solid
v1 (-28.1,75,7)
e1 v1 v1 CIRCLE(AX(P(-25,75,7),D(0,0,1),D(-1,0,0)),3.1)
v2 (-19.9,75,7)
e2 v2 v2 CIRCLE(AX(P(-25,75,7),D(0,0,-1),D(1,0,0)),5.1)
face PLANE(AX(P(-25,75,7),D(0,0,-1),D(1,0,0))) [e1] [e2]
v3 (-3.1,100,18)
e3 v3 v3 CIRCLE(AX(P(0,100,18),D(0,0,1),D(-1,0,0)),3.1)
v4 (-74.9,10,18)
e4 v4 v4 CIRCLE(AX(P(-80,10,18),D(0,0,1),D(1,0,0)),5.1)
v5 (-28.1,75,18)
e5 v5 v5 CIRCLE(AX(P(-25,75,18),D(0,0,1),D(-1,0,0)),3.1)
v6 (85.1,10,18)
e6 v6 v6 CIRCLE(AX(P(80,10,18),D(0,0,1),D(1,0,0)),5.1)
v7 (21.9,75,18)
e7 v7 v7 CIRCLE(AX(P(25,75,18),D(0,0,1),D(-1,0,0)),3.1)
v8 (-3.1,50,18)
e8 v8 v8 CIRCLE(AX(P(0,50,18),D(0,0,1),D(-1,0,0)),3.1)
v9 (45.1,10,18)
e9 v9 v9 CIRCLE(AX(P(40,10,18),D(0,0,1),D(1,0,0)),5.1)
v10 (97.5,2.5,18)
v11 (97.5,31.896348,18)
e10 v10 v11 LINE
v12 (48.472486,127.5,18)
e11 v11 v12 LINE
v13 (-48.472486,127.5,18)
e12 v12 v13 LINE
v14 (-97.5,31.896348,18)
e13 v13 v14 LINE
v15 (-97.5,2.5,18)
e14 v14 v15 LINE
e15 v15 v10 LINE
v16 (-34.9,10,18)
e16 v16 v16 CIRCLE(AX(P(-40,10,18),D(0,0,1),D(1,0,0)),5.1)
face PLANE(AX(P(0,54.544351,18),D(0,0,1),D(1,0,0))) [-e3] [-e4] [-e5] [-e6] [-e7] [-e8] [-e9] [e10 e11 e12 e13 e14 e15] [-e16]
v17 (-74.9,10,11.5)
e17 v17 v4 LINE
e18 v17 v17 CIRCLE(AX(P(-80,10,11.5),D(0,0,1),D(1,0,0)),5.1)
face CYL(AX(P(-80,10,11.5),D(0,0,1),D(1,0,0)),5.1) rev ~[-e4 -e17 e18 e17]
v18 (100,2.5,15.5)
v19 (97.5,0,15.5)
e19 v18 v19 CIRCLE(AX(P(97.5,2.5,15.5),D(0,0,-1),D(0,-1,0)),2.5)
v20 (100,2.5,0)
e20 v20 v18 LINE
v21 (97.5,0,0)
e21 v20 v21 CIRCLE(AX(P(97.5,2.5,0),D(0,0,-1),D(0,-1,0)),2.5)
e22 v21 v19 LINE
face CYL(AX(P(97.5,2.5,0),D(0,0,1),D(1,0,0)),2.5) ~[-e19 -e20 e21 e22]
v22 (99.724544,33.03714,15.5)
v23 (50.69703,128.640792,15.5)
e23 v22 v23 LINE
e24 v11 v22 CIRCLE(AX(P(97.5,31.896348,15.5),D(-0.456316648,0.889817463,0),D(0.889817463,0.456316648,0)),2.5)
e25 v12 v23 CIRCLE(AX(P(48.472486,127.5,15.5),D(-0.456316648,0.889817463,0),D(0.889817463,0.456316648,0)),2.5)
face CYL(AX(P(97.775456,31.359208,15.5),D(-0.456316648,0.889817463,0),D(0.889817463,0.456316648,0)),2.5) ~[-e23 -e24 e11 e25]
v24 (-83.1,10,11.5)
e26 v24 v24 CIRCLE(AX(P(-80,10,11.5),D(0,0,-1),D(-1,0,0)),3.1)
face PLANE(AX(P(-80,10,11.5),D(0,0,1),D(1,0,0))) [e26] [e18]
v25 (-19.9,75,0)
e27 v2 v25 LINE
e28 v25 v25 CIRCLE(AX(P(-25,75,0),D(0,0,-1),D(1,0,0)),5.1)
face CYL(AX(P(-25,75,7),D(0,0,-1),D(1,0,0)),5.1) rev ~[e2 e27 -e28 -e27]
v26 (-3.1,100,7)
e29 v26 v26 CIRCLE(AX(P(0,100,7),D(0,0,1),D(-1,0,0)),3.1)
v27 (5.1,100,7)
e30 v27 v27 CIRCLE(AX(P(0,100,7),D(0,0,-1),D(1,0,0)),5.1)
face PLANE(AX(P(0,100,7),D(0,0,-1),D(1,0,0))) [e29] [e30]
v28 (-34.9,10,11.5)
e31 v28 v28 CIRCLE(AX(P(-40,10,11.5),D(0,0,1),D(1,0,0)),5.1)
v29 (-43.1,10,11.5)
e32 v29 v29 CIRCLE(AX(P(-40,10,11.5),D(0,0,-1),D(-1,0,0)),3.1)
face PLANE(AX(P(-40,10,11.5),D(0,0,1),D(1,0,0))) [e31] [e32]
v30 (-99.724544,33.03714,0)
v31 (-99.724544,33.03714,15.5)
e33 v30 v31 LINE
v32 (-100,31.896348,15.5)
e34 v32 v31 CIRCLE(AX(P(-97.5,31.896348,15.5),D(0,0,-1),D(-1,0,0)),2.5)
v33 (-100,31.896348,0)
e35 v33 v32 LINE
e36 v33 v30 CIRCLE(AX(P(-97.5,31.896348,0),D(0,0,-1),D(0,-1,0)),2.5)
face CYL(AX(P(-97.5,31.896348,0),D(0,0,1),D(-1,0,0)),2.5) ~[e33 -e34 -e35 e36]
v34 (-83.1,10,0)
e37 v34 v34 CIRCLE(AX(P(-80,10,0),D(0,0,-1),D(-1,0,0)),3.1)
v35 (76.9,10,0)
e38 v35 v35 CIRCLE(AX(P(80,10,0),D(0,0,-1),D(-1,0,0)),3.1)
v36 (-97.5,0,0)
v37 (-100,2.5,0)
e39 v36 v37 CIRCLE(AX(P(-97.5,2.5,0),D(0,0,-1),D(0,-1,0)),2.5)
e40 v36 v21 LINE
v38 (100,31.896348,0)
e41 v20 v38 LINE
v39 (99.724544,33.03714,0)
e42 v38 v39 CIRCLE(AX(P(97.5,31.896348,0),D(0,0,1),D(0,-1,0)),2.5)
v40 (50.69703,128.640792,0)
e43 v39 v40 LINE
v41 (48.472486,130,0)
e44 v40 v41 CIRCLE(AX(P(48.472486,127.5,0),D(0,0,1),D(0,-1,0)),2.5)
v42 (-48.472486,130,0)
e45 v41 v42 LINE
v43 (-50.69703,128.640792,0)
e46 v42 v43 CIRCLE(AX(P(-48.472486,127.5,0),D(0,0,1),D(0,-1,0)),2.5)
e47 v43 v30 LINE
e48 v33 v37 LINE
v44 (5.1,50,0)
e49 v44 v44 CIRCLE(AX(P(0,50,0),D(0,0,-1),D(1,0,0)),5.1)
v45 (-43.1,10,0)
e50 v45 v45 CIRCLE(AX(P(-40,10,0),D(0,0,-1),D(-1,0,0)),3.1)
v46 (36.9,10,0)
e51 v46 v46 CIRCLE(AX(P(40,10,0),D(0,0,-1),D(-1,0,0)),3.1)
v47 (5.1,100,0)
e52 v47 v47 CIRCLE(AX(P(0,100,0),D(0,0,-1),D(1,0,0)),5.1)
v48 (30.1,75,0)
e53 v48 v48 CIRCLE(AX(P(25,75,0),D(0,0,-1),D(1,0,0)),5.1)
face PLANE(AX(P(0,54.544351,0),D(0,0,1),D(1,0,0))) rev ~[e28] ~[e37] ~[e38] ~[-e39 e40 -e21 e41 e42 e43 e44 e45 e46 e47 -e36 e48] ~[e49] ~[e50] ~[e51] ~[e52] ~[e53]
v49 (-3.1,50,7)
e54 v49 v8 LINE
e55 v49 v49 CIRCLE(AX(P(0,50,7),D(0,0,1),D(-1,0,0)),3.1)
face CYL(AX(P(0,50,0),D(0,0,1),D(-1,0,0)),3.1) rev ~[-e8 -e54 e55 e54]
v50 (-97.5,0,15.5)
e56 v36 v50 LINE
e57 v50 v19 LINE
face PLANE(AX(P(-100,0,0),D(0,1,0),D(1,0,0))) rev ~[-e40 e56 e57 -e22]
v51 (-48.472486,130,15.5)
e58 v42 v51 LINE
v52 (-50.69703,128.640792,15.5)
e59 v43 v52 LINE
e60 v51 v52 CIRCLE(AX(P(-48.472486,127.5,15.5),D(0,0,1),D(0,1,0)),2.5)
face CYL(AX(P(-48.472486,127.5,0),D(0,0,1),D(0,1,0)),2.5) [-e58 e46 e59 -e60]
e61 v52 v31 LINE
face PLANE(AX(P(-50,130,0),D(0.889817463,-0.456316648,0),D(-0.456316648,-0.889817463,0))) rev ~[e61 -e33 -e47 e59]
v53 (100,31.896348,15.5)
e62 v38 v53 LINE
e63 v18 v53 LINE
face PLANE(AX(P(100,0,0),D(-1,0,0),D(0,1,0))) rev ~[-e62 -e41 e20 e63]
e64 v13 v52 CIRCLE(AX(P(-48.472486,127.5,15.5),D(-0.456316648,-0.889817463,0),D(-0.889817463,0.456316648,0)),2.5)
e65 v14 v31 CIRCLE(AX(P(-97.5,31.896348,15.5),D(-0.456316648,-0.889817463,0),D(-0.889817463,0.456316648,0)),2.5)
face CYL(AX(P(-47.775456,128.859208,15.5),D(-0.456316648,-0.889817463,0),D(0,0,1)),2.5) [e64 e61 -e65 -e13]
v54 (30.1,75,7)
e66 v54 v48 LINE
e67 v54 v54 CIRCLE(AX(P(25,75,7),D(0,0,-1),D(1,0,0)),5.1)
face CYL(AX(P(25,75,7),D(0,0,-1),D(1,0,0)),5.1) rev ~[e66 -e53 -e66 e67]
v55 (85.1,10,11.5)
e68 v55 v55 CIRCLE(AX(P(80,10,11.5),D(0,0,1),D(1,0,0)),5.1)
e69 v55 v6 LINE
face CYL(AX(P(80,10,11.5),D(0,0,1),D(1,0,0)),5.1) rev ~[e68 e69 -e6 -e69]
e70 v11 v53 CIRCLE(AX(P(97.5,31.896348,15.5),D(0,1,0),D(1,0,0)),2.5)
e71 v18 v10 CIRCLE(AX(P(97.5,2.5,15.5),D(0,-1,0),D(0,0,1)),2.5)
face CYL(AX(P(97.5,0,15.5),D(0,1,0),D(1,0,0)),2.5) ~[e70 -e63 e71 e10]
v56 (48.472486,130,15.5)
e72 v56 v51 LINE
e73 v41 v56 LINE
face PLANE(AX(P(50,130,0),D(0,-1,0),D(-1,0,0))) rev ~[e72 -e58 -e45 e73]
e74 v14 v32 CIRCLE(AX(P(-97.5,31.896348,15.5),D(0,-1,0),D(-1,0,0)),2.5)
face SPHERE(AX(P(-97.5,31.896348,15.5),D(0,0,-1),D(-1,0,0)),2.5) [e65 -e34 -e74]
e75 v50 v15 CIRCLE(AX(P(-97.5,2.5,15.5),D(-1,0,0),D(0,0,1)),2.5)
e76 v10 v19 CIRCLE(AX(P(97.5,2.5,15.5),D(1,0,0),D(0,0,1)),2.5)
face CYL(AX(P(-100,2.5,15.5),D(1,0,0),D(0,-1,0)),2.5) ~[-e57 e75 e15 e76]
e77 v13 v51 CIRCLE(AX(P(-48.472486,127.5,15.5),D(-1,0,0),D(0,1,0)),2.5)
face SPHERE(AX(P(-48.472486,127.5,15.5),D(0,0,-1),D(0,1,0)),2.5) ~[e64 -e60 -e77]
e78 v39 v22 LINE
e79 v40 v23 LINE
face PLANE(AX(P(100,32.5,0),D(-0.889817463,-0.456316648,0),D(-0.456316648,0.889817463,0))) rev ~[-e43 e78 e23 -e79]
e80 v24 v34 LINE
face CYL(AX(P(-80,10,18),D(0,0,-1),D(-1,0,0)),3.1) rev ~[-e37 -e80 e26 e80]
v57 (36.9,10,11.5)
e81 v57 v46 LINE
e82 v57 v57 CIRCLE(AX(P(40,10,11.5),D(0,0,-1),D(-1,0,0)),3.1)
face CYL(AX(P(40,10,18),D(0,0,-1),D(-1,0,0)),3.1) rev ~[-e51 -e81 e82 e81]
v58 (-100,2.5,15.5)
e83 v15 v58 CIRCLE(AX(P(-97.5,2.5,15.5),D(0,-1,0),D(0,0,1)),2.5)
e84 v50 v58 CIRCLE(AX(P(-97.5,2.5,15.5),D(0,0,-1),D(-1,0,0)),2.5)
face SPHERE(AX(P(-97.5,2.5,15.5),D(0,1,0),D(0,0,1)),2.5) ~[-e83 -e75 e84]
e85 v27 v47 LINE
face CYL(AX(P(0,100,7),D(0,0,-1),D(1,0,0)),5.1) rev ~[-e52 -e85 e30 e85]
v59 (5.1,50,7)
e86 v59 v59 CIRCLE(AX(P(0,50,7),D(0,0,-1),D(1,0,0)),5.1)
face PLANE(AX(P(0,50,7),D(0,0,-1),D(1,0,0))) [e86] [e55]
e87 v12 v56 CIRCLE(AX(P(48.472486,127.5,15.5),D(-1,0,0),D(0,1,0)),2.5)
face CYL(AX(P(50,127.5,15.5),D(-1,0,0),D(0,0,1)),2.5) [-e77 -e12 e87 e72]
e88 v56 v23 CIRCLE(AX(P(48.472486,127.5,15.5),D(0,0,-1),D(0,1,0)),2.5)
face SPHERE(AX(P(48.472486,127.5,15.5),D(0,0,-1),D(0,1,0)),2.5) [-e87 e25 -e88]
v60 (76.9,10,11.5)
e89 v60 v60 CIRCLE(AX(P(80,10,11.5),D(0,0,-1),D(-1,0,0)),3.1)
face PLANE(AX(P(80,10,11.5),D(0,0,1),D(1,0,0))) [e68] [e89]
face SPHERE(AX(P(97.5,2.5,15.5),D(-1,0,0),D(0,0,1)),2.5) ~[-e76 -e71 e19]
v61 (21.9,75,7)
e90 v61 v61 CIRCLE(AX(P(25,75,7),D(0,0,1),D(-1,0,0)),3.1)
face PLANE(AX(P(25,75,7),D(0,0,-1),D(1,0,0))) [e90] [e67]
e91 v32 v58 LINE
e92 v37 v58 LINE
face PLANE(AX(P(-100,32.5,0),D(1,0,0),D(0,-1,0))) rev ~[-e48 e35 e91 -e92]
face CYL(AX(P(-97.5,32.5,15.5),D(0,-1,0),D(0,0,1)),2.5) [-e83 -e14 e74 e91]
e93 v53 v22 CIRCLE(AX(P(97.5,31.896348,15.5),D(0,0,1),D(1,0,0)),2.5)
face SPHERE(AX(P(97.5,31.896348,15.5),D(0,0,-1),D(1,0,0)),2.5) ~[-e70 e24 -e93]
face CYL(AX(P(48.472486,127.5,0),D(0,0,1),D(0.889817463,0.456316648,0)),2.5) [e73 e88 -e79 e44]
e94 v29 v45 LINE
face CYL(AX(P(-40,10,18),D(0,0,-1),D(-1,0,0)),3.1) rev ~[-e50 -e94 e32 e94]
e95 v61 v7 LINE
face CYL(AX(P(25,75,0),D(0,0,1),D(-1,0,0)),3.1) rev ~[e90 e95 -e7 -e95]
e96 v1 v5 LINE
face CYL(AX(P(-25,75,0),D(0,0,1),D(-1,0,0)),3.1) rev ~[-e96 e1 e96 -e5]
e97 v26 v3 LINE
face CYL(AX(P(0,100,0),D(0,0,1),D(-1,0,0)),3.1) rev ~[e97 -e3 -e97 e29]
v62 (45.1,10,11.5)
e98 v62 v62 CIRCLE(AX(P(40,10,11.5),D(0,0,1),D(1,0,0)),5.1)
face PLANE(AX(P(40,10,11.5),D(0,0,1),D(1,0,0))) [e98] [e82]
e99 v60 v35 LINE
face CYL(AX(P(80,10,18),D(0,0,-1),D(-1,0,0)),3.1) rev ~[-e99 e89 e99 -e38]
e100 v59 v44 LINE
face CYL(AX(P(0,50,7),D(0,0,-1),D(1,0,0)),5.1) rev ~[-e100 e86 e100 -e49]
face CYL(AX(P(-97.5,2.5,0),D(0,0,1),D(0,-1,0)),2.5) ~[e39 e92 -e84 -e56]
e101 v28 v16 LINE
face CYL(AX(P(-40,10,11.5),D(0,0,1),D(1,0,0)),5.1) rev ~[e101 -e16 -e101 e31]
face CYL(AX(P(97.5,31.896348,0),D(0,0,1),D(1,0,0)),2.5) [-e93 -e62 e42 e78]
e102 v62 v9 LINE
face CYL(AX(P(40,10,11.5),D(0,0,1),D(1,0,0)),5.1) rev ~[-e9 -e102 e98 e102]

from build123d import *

# Parameters (mm, degrees)
F1_DEPTH       = 18
F2_D           = 6.2
F2_CBORE_D     = 10.2
F2_CBORE_DEPTH = 7
F4_D           = 6.2
F4_CBORE_D     = 10.2
F4_CBORE_DEPTH = 6.5
F5_R           = 2.5


with BuildPart() as f1:
    # F0 (on Top) → F1 (new body)
    with BuildSketch(Plane.XY):
        Polygon((-80, 0), (0, 0), (100, 0), (100, 32.5), (50, 130), (0, 130), (-50, 130), (-100, 32.5), (-100, 0), align=None)
    extrude(amount=F1_DEPTH)

    # F2 (through all)
    with Locations(Plane(origin=(0, 0, 0), x_dir=(1, 0, 0), z_dir=(0, 0, -1))):
        with Locations((0, -100), (25, -75), (0, -50), (-25, -75)):
            CounterBoreHole(F2_D / 2, F2_CBORE_D / 2, F2_CBORE_DEPTH)

    # F4 (through all)
    with Locations(Plane.XY.offset(18)):
        with Locations((-80, 10), (-40, 10), (40, 10), (80, 10)):
            CounterBoreHole(F4_D / 2, F4_CBORE_D / 2, F4_CBORE_DEPTH)

    # F5
    f5_edges = [f1.edges().sort_by_distance(p)[0] for p in [
        (-100, 32.5, 9),
        (-100, 16.25, 18),
        (0, 0, 18),
        (100, 16.25, 18),
        (-75, 81.25, 18),
        (75, 81.25, 18),
        (50, 130, 9),
        (-50, 130, 9),
        (100, 0, 9),
        (-100, 0, 9),
        (100, 32.5, 9),
        (0, 130, 18),
    ]]
    fillet(f5_edges, radius=F5_R)


solid = f1.part
